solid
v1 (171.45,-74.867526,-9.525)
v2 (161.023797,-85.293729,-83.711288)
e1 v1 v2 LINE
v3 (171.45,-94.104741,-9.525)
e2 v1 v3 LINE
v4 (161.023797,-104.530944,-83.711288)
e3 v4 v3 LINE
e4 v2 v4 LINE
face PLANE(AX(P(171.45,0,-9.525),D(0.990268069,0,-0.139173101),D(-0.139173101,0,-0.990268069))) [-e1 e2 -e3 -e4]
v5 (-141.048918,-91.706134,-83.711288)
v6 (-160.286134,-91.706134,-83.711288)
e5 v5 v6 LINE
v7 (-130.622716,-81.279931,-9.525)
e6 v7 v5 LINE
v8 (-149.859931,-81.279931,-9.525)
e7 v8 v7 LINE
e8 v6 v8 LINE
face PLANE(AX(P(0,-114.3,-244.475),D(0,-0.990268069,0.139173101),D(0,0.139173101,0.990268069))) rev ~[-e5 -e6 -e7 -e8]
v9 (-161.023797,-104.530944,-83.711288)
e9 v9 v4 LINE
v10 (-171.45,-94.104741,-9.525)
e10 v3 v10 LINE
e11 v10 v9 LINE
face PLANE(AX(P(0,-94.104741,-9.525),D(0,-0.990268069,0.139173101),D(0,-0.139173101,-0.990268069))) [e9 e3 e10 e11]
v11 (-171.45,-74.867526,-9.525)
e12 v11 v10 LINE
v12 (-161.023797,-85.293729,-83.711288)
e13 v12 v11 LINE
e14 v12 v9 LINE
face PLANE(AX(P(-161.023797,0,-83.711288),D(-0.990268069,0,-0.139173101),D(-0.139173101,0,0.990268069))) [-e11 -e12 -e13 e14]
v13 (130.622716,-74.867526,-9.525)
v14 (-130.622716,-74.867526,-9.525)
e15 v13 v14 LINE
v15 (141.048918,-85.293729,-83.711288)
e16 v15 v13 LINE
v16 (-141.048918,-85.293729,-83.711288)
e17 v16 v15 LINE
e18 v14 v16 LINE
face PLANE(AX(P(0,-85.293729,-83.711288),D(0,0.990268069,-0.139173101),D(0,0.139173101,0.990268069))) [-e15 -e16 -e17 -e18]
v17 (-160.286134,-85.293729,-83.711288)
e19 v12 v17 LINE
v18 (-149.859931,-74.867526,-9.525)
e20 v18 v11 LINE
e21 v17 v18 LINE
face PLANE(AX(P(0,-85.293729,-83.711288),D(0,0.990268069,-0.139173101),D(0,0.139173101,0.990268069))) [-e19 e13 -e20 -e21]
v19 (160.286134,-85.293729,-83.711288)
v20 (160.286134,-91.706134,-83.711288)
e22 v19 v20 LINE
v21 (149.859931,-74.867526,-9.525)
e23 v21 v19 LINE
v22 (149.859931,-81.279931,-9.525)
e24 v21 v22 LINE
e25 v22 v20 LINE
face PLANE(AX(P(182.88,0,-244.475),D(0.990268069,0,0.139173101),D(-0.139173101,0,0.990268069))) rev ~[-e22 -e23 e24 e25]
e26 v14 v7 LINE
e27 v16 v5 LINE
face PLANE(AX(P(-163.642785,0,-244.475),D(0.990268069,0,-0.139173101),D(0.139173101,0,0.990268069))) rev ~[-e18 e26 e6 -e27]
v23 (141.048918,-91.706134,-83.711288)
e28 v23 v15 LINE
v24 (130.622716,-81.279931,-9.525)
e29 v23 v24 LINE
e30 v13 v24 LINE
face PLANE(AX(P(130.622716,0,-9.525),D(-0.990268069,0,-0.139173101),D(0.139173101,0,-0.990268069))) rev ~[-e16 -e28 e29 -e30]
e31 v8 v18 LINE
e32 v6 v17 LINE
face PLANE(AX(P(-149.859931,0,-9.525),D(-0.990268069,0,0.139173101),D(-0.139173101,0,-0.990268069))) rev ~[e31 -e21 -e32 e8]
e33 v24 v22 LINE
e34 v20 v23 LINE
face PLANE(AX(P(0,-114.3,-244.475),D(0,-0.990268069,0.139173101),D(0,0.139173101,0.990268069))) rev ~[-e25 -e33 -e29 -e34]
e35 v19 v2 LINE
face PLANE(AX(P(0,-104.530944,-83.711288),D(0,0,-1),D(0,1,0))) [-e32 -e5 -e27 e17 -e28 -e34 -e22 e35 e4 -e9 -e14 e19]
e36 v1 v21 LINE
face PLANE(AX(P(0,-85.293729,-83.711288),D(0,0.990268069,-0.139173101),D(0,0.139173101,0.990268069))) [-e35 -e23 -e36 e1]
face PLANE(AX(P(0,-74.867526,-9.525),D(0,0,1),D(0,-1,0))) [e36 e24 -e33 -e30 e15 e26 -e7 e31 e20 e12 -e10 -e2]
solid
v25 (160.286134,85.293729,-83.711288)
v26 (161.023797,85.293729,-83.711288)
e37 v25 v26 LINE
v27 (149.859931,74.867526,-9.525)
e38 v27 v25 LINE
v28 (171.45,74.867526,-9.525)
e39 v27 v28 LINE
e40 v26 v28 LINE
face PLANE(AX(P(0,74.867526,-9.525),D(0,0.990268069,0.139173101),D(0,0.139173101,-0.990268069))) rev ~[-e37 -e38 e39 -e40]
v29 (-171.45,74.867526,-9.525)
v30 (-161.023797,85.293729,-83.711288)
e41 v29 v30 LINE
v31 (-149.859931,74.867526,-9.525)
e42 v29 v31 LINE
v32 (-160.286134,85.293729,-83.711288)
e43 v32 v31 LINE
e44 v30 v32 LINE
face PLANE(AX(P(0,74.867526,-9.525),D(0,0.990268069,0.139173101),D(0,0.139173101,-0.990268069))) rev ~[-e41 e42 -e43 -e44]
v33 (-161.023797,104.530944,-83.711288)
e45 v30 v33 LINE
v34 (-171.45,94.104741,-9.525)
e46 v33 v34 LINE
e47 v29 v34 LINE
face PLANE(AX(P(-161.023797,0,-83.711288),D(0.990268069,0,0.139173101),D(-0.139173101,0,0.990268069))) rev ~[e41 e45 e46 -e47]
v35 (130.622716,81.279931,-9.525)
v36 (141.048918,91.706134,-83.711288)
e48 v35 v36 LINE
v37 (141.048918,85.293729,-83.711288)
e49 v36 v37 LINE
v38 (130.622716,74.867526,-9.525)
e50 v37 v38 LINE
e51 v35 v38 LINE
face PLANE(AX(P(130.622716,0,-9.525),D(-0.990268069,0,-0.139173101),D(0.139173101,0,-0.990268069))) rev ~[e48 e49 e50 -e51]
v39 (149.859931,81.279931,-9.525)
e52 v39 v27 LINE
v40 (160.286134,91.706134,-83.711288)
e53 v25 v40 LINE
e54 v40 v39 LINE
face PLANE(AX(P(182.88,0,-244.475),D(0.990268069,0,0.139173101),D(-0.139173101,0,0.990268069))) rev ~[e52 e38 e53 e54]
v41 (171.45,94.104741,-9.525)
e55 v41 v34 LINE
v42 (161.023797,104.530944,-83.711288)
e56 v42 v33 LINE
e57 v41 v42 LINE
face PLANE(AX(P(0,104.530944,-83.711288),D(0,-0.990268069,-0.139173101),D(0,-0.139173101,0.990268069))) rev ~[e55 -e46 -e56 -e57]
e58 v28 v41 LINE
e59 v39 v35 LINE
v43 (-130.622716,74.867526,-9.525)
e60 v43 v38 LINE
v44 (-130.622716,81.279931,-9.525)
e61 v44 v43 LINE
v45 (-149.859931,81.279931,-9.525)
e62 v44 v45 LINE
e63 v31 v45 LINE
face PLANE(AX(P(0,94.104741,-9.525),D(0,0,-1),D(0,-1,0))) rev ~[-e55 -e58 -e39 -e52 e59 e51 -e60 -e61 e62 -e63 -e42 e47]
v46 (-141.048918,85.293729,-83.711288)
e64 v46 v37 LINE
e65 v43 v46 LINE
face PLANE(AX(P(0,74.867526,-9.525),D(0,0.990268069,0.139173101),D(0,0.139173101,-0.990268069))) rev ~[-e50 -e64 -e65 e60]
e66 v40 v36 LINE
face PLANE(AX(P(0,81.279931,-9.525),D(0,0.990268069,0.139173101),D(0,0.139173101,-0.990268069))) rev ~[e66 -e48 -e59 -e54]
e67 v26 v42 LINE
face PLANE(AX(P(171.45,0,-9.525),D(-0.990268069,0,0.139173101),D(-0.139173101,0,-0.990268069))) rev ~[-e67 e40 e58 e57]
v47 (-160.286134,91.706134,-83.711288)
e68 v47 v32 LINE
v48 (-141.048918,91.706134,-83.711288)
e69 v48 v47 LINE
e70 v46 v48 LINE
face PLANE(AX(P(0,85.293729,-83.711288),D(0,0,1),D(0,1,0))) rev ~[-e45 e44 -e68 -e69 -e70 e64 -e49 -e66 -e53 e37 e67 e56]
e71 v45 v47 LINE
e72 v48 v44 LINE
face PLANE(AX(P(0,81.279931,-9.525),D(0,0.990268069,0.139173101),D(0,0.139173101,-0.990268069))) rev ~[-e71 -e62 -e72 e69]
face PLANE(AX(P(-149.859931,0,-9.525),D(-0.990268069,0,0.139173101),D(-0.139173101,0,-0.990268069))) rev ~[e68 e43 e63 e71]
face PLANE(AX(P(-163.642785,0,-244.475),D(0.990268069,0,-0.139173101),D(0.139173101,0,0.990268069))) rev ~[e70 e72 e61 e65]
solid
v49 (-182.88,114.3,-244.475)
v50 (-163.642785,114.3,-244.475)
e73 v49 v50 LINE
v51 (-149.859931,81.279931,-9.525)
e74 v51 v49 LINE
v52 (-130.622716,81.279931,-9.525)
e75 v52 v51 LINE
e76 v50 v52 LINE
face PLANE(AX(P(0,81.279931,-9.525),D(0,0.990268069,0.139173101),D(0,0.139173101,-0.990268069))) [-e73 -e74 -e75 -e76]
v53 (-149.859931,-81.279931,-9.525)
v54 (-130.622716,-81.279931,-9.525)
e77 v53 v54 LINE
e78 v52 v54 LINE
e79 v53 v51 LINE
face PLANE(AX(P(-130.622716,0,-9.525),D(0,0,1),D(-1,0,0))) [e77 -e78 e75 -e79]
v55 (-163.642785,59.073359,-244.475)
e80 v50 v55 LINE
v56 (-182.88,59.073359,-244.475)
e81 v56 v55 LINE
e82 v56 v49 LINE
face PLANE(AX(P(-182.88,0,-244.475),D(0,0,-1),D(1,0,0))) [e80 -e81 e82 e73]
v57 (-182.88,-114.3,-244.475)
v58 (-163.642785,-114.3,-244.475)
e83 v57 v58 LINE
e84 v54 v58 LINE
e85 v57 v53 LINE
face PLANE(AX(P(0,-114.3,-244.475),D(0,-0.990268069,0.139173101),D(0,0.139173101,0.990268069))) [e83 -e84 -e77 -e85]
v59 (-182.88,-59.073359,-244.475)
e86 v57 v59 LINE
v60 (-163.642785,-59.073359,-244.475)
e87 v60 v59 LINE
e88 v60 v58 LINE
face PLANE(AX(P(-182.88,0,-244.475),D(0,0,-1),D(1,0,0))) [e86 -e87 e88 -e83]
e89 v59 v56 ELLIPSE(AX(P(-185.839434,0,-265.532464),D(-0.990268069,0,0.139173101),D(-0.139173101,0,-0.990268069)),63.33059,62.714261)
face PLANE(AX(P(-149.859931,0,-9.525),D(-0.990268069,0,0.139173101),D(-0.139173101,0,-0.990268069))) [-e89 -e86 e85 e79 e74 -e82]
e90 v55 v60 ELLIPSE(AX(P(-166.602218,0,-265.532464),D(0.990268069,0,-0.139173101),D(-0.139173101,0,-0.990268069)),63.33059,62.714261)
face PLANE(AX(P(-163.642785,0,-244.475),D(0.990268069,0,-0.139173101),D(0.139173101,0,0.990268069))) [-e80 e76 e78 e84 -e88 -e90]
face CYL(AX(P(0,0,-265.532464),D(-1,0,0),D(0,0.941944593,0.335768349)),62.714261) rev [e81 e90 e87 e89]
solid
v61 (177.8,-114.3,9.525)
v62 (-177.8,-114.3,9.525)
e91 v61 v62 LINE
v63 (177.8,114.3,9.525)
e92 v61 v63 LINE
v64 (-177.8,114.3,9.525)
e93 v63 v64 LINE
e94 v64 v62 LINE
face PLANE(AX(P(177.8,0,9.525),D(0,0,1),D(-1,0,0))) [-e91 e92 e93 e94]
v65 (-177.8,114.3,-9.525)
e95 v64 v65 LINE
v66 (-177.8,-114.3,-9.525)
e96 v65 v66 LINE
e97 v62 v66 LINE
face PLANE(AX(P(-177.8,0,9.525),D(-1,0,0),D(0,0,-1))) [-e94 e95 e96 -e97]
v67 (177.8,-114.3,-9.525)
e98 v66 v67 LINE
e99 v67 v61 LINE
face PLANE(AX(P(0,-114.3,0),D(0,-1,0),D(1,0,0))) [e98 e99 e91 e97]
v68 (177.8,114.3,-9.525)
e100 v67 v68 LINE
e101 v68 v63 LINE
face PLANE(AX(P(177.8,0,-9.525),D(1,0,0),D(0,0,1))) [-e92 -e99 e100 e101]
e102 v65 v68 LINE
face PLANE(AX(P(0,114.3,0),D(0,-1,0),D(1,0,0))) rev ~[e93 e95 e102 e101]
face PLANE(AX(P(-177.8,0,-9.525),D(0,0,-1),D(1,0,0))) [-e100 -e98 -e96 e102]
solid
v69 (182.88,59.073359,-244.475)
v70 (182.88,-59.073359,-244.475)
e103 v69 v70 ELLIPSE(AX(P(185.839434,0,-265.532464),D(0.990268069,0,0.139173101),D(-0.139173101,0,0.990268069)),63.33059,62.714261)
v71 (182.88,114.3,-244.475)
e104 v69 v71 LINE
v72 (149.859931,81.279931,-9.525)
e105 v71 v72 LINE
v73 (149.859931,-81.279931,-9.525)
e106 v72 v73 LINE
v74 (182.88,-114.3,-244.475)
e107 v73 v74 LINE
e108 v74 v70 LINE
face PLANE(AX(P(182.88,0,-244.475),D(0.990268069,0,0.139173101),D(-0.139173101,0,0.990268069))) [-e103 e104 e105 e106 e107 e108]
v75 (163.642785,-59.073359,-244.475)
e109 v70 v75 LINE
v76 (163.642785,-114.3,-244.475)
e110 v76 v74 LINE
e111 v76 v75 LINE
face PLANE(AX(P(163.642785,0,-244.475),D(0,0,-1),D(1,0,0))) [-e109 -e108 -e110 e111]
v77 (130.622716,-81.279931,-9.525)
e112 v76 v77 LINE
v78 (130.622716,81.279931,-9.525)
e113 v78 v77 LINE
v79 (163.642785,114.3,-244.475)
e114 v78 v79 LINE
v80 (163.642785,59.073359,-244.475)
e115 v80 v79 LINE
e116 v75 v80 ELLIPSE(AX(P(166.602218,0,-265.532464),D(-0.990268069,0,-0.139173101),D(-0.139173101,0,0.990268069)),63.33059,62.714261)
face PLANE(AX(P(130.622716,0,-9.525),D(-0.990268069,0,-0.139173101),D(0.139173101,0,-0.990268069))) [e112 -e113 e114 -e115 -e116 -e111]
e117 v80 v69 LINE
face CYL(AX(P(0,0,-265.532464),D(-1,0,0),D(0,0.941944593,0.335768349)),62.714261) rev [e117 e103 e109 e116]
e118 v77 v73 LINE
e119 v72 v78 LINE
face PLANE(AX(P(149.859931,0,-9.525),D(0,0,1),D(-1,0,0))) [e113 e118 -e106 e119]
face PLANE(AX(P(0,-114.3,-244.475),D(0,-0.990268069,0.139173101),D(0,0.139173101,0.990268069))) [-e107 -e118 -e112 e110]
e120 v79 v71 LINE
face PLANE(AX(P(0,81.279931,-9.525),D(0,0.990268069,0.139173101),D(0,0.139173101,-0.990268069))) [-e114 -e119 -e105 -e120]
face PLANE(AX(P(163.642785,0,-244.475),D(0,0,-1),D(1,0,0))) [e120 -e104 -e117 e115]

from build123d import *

# Parameters (mm, degrees)
F1_DEPTH      = 114.3
F2_DEPTH      = 114.3
F2_DEPTH_BACK = 114.3
F4_DEPTH      = 182.881
F4_DEPTH_BACK = 182.881
F6_DEPTH      = 177.8
F6_DEPTH_BACK = 177.8
F7_DEPTH      = 114.301
F7_DEPTH_BACK = 114.301
F8_DEPTH      = 177.8
F8_DEPTH_BACK = 177.8
F13_DEPTH     = 114.301
F14_DEPTH     = 114.301


# Not quite as in the source:
# - a feature names something its author has since deleted; it is built from what else it names


with BuildPart() as f1:
    # F0 (on Front) → F1 (new body, symmetric)
    with BuildSketch(Plane.XZ):
        Polygon((177.8, 9.525), (-177.8, 9.525), (-177.8, -9.525), (-171.45, -9.525), (-149.8599308867, -9.525), (-130.6227156302, -9.525), (130.6227156302, -9.525), (149.8599308867, -9.525), (171.45, -9.525), (177.8, -9.525), align=None)
    extrude(amount=F1_DEPTH, both=True)


with BuildPart() as f2:
    # F0 (on Front) → F2 (new body, two sides)
    with BuildSketch(Plane.XZ) as f2_sk:
        Polygon((-141.0489184441, -83.7112878215), (-160.2861337006, -83.7112878215), (-182.88, -244.475), (-163.6427847435, -244.475), align=None)
        Polygon((-130.6227156302, -9.525), (-149.8599308867, -9.525), (-160.2861337006, -83.7112878215), (-141.0489184441, -83.7112878215), align=None)
    extrude(amount=F2_DEPTH)
    extrude(f2_sk.sketch, amount=-F2_DEPTH_BACK)


with BuildPart() as f2b:
    # F0 (on Front) → F2, piece 2 (new body, two sides)
    with BuildSketch(Plane.XZ) as f2_2_sk:
        Polygon((182.88, -244.475), (160.2861337006, -83.7112878215), (141.0489184441, -83.7112878215), (163.6427847435, -244.475), align=None)
        Polygon((160.2861337006, -83.7112878215), (149.8599308867, -9.525), (130.6227156302, -9.525), (141.0489184441, -83.7112878215), align=None)
    extrude(amount=F2_DEPTH)
    extrude(f2_2_sk.sketch, amount=-F2_DEPTH_BACK)


with BuildPart() as f4_tool:
    # F3 (on Right) → F4 (new body, two sides)
    with BuildSketch(Plane.YZ) as f4_sk:
        Polygon((-114.3, -244.475), (-81.2799308867, -9.525), (-114.3000000004, -9.525), align=None)
        with BuildLine():
            Line((-59.0733587742, -244.475), (59.0733587742, -244.475))
            ThreePointArc((59.0733587742, -244.475), (0, -202.8182030655), (-59.0733587742, -244.475))
        make_face()
        Polygon((114.3, -244.475), (114.3, -9.525), (81.2799308867, -9.525), align=None)
    extrude(amount=-F4_DEPTH)
    extrude(f4_sk.sketch, amount=F4_DEPTH_BACK)


with BuildPart() as f2_1:
    add(f2.part)

    # F4: cut by f4_tool
    add(f4_tool.part, mode=Mode.SUBTRACT)


with BuildPart() as f2b_1:
    add(f2b.part)

    # F4: cut by f4_tool
    add(f4_tool.part, mode=Mode.SUBTRACT)


with BuildPart() as f6:
    # F5 (on Right) → F6 (new body, two sides)
    with BuildSketch(Plane.YZ) as f6_sk:
        Polygon((-91.7061337006, -83.7112878215), (-81.2799308867, -9.525), (-94.1047410577, -9.525), (-104.5309438716, -83.7112878215), align=None)
        Polygon((-74.8675258012, -9.525), (-81.2799308867, -9.525), (-91.7061337006, -83.7112878215), (-85.2937286151, -83.7112878215), align=None)
    extrude(amount=F6_DEPTH)
    extrude(f6_sk.sketch, amount=-F6_DEPTH_BACK)

    # F0 (on Front) → F7 (cut, two sides)
    with BuildSketch(Plane.XZ) as f7_sk:
        Polygon((-171.45, -9.525), (-177.8, -9.525), (-177.8, -83.7112878215), (-161.0237971861, -83.7112878215), align=None)
        Polygon((177.8, -83.7112878215), (177.8, -9.525), (171.45, -9.525), (161.0237971861, -83.7112878215), align=None)
    extrude(amount=-F7_DEPTH, mode=Mode.SUBTRACT)
    extrude(f7_sk.sketch, amount=F7_DEPTH_BACK, mode=Mode.SUBTRACT)

    # F10: cut F2
    add(f2_1.part, mode=Mode.SUBTRACT)

    # F11: cut F2b
    add(f2b_1.part, mode=Mode.SUBTRACT)


with BuildPart() as f8:
    # F5 (on Right) → F8 (new body, two sides)
    with BuildSketch(Plane.YZ) as f8_sk:
        Polygon((94.1047410577, -9.525), (81.2799308867, -9.525), (91.7061337006, -83.7112878215), (104.5309438716, -83.7112878215), align=None)
        Polygon((81.2799308867, -9.525), (74.8675258012, -9.525), (85.2937286151, -83.7112878215), (91.7061337006, -83.7112878215), align=None)
    extrude(amount=-F8_DEPTH)
    extrude(f8_sk.sketch, amount=F8_DEPTH_BACK)

    # F9: cut F2
    add(f2_1.part, mode=Mode.SUBTRACT)

    # F12: cut F2b
    add(f2b_1.part, mode=Mode.SUBTRACT)

    # F0 (on Front) → F13 (cut, through all)
    with BuildSketch(Plane.XZ):
        Polygon((177.8, -83.7112878215), (177.8, -9.525), (171.45, -9.525), (161.0237971861, -83.7112878215), align=None)
    extrude(amount=-F13_DEPTH, mode=Mode.SUBTRACT)

    # F0 (on Front) → F14 (cut, through all)
    with BuildSketch(Plane.XZ):
        Polygon((-171.45, -9.525), (-177.8, -9.525), (-177.8, -83.7112878215), (-161.0237971861, -83.7112878215), align=None)
    extrude(amount=-F14_DEPTH, mode=Mode.SUBTRACT)


solid = Compound([f1.part, f2_1.part, f2b_1.part, f6.part, f8.part])
